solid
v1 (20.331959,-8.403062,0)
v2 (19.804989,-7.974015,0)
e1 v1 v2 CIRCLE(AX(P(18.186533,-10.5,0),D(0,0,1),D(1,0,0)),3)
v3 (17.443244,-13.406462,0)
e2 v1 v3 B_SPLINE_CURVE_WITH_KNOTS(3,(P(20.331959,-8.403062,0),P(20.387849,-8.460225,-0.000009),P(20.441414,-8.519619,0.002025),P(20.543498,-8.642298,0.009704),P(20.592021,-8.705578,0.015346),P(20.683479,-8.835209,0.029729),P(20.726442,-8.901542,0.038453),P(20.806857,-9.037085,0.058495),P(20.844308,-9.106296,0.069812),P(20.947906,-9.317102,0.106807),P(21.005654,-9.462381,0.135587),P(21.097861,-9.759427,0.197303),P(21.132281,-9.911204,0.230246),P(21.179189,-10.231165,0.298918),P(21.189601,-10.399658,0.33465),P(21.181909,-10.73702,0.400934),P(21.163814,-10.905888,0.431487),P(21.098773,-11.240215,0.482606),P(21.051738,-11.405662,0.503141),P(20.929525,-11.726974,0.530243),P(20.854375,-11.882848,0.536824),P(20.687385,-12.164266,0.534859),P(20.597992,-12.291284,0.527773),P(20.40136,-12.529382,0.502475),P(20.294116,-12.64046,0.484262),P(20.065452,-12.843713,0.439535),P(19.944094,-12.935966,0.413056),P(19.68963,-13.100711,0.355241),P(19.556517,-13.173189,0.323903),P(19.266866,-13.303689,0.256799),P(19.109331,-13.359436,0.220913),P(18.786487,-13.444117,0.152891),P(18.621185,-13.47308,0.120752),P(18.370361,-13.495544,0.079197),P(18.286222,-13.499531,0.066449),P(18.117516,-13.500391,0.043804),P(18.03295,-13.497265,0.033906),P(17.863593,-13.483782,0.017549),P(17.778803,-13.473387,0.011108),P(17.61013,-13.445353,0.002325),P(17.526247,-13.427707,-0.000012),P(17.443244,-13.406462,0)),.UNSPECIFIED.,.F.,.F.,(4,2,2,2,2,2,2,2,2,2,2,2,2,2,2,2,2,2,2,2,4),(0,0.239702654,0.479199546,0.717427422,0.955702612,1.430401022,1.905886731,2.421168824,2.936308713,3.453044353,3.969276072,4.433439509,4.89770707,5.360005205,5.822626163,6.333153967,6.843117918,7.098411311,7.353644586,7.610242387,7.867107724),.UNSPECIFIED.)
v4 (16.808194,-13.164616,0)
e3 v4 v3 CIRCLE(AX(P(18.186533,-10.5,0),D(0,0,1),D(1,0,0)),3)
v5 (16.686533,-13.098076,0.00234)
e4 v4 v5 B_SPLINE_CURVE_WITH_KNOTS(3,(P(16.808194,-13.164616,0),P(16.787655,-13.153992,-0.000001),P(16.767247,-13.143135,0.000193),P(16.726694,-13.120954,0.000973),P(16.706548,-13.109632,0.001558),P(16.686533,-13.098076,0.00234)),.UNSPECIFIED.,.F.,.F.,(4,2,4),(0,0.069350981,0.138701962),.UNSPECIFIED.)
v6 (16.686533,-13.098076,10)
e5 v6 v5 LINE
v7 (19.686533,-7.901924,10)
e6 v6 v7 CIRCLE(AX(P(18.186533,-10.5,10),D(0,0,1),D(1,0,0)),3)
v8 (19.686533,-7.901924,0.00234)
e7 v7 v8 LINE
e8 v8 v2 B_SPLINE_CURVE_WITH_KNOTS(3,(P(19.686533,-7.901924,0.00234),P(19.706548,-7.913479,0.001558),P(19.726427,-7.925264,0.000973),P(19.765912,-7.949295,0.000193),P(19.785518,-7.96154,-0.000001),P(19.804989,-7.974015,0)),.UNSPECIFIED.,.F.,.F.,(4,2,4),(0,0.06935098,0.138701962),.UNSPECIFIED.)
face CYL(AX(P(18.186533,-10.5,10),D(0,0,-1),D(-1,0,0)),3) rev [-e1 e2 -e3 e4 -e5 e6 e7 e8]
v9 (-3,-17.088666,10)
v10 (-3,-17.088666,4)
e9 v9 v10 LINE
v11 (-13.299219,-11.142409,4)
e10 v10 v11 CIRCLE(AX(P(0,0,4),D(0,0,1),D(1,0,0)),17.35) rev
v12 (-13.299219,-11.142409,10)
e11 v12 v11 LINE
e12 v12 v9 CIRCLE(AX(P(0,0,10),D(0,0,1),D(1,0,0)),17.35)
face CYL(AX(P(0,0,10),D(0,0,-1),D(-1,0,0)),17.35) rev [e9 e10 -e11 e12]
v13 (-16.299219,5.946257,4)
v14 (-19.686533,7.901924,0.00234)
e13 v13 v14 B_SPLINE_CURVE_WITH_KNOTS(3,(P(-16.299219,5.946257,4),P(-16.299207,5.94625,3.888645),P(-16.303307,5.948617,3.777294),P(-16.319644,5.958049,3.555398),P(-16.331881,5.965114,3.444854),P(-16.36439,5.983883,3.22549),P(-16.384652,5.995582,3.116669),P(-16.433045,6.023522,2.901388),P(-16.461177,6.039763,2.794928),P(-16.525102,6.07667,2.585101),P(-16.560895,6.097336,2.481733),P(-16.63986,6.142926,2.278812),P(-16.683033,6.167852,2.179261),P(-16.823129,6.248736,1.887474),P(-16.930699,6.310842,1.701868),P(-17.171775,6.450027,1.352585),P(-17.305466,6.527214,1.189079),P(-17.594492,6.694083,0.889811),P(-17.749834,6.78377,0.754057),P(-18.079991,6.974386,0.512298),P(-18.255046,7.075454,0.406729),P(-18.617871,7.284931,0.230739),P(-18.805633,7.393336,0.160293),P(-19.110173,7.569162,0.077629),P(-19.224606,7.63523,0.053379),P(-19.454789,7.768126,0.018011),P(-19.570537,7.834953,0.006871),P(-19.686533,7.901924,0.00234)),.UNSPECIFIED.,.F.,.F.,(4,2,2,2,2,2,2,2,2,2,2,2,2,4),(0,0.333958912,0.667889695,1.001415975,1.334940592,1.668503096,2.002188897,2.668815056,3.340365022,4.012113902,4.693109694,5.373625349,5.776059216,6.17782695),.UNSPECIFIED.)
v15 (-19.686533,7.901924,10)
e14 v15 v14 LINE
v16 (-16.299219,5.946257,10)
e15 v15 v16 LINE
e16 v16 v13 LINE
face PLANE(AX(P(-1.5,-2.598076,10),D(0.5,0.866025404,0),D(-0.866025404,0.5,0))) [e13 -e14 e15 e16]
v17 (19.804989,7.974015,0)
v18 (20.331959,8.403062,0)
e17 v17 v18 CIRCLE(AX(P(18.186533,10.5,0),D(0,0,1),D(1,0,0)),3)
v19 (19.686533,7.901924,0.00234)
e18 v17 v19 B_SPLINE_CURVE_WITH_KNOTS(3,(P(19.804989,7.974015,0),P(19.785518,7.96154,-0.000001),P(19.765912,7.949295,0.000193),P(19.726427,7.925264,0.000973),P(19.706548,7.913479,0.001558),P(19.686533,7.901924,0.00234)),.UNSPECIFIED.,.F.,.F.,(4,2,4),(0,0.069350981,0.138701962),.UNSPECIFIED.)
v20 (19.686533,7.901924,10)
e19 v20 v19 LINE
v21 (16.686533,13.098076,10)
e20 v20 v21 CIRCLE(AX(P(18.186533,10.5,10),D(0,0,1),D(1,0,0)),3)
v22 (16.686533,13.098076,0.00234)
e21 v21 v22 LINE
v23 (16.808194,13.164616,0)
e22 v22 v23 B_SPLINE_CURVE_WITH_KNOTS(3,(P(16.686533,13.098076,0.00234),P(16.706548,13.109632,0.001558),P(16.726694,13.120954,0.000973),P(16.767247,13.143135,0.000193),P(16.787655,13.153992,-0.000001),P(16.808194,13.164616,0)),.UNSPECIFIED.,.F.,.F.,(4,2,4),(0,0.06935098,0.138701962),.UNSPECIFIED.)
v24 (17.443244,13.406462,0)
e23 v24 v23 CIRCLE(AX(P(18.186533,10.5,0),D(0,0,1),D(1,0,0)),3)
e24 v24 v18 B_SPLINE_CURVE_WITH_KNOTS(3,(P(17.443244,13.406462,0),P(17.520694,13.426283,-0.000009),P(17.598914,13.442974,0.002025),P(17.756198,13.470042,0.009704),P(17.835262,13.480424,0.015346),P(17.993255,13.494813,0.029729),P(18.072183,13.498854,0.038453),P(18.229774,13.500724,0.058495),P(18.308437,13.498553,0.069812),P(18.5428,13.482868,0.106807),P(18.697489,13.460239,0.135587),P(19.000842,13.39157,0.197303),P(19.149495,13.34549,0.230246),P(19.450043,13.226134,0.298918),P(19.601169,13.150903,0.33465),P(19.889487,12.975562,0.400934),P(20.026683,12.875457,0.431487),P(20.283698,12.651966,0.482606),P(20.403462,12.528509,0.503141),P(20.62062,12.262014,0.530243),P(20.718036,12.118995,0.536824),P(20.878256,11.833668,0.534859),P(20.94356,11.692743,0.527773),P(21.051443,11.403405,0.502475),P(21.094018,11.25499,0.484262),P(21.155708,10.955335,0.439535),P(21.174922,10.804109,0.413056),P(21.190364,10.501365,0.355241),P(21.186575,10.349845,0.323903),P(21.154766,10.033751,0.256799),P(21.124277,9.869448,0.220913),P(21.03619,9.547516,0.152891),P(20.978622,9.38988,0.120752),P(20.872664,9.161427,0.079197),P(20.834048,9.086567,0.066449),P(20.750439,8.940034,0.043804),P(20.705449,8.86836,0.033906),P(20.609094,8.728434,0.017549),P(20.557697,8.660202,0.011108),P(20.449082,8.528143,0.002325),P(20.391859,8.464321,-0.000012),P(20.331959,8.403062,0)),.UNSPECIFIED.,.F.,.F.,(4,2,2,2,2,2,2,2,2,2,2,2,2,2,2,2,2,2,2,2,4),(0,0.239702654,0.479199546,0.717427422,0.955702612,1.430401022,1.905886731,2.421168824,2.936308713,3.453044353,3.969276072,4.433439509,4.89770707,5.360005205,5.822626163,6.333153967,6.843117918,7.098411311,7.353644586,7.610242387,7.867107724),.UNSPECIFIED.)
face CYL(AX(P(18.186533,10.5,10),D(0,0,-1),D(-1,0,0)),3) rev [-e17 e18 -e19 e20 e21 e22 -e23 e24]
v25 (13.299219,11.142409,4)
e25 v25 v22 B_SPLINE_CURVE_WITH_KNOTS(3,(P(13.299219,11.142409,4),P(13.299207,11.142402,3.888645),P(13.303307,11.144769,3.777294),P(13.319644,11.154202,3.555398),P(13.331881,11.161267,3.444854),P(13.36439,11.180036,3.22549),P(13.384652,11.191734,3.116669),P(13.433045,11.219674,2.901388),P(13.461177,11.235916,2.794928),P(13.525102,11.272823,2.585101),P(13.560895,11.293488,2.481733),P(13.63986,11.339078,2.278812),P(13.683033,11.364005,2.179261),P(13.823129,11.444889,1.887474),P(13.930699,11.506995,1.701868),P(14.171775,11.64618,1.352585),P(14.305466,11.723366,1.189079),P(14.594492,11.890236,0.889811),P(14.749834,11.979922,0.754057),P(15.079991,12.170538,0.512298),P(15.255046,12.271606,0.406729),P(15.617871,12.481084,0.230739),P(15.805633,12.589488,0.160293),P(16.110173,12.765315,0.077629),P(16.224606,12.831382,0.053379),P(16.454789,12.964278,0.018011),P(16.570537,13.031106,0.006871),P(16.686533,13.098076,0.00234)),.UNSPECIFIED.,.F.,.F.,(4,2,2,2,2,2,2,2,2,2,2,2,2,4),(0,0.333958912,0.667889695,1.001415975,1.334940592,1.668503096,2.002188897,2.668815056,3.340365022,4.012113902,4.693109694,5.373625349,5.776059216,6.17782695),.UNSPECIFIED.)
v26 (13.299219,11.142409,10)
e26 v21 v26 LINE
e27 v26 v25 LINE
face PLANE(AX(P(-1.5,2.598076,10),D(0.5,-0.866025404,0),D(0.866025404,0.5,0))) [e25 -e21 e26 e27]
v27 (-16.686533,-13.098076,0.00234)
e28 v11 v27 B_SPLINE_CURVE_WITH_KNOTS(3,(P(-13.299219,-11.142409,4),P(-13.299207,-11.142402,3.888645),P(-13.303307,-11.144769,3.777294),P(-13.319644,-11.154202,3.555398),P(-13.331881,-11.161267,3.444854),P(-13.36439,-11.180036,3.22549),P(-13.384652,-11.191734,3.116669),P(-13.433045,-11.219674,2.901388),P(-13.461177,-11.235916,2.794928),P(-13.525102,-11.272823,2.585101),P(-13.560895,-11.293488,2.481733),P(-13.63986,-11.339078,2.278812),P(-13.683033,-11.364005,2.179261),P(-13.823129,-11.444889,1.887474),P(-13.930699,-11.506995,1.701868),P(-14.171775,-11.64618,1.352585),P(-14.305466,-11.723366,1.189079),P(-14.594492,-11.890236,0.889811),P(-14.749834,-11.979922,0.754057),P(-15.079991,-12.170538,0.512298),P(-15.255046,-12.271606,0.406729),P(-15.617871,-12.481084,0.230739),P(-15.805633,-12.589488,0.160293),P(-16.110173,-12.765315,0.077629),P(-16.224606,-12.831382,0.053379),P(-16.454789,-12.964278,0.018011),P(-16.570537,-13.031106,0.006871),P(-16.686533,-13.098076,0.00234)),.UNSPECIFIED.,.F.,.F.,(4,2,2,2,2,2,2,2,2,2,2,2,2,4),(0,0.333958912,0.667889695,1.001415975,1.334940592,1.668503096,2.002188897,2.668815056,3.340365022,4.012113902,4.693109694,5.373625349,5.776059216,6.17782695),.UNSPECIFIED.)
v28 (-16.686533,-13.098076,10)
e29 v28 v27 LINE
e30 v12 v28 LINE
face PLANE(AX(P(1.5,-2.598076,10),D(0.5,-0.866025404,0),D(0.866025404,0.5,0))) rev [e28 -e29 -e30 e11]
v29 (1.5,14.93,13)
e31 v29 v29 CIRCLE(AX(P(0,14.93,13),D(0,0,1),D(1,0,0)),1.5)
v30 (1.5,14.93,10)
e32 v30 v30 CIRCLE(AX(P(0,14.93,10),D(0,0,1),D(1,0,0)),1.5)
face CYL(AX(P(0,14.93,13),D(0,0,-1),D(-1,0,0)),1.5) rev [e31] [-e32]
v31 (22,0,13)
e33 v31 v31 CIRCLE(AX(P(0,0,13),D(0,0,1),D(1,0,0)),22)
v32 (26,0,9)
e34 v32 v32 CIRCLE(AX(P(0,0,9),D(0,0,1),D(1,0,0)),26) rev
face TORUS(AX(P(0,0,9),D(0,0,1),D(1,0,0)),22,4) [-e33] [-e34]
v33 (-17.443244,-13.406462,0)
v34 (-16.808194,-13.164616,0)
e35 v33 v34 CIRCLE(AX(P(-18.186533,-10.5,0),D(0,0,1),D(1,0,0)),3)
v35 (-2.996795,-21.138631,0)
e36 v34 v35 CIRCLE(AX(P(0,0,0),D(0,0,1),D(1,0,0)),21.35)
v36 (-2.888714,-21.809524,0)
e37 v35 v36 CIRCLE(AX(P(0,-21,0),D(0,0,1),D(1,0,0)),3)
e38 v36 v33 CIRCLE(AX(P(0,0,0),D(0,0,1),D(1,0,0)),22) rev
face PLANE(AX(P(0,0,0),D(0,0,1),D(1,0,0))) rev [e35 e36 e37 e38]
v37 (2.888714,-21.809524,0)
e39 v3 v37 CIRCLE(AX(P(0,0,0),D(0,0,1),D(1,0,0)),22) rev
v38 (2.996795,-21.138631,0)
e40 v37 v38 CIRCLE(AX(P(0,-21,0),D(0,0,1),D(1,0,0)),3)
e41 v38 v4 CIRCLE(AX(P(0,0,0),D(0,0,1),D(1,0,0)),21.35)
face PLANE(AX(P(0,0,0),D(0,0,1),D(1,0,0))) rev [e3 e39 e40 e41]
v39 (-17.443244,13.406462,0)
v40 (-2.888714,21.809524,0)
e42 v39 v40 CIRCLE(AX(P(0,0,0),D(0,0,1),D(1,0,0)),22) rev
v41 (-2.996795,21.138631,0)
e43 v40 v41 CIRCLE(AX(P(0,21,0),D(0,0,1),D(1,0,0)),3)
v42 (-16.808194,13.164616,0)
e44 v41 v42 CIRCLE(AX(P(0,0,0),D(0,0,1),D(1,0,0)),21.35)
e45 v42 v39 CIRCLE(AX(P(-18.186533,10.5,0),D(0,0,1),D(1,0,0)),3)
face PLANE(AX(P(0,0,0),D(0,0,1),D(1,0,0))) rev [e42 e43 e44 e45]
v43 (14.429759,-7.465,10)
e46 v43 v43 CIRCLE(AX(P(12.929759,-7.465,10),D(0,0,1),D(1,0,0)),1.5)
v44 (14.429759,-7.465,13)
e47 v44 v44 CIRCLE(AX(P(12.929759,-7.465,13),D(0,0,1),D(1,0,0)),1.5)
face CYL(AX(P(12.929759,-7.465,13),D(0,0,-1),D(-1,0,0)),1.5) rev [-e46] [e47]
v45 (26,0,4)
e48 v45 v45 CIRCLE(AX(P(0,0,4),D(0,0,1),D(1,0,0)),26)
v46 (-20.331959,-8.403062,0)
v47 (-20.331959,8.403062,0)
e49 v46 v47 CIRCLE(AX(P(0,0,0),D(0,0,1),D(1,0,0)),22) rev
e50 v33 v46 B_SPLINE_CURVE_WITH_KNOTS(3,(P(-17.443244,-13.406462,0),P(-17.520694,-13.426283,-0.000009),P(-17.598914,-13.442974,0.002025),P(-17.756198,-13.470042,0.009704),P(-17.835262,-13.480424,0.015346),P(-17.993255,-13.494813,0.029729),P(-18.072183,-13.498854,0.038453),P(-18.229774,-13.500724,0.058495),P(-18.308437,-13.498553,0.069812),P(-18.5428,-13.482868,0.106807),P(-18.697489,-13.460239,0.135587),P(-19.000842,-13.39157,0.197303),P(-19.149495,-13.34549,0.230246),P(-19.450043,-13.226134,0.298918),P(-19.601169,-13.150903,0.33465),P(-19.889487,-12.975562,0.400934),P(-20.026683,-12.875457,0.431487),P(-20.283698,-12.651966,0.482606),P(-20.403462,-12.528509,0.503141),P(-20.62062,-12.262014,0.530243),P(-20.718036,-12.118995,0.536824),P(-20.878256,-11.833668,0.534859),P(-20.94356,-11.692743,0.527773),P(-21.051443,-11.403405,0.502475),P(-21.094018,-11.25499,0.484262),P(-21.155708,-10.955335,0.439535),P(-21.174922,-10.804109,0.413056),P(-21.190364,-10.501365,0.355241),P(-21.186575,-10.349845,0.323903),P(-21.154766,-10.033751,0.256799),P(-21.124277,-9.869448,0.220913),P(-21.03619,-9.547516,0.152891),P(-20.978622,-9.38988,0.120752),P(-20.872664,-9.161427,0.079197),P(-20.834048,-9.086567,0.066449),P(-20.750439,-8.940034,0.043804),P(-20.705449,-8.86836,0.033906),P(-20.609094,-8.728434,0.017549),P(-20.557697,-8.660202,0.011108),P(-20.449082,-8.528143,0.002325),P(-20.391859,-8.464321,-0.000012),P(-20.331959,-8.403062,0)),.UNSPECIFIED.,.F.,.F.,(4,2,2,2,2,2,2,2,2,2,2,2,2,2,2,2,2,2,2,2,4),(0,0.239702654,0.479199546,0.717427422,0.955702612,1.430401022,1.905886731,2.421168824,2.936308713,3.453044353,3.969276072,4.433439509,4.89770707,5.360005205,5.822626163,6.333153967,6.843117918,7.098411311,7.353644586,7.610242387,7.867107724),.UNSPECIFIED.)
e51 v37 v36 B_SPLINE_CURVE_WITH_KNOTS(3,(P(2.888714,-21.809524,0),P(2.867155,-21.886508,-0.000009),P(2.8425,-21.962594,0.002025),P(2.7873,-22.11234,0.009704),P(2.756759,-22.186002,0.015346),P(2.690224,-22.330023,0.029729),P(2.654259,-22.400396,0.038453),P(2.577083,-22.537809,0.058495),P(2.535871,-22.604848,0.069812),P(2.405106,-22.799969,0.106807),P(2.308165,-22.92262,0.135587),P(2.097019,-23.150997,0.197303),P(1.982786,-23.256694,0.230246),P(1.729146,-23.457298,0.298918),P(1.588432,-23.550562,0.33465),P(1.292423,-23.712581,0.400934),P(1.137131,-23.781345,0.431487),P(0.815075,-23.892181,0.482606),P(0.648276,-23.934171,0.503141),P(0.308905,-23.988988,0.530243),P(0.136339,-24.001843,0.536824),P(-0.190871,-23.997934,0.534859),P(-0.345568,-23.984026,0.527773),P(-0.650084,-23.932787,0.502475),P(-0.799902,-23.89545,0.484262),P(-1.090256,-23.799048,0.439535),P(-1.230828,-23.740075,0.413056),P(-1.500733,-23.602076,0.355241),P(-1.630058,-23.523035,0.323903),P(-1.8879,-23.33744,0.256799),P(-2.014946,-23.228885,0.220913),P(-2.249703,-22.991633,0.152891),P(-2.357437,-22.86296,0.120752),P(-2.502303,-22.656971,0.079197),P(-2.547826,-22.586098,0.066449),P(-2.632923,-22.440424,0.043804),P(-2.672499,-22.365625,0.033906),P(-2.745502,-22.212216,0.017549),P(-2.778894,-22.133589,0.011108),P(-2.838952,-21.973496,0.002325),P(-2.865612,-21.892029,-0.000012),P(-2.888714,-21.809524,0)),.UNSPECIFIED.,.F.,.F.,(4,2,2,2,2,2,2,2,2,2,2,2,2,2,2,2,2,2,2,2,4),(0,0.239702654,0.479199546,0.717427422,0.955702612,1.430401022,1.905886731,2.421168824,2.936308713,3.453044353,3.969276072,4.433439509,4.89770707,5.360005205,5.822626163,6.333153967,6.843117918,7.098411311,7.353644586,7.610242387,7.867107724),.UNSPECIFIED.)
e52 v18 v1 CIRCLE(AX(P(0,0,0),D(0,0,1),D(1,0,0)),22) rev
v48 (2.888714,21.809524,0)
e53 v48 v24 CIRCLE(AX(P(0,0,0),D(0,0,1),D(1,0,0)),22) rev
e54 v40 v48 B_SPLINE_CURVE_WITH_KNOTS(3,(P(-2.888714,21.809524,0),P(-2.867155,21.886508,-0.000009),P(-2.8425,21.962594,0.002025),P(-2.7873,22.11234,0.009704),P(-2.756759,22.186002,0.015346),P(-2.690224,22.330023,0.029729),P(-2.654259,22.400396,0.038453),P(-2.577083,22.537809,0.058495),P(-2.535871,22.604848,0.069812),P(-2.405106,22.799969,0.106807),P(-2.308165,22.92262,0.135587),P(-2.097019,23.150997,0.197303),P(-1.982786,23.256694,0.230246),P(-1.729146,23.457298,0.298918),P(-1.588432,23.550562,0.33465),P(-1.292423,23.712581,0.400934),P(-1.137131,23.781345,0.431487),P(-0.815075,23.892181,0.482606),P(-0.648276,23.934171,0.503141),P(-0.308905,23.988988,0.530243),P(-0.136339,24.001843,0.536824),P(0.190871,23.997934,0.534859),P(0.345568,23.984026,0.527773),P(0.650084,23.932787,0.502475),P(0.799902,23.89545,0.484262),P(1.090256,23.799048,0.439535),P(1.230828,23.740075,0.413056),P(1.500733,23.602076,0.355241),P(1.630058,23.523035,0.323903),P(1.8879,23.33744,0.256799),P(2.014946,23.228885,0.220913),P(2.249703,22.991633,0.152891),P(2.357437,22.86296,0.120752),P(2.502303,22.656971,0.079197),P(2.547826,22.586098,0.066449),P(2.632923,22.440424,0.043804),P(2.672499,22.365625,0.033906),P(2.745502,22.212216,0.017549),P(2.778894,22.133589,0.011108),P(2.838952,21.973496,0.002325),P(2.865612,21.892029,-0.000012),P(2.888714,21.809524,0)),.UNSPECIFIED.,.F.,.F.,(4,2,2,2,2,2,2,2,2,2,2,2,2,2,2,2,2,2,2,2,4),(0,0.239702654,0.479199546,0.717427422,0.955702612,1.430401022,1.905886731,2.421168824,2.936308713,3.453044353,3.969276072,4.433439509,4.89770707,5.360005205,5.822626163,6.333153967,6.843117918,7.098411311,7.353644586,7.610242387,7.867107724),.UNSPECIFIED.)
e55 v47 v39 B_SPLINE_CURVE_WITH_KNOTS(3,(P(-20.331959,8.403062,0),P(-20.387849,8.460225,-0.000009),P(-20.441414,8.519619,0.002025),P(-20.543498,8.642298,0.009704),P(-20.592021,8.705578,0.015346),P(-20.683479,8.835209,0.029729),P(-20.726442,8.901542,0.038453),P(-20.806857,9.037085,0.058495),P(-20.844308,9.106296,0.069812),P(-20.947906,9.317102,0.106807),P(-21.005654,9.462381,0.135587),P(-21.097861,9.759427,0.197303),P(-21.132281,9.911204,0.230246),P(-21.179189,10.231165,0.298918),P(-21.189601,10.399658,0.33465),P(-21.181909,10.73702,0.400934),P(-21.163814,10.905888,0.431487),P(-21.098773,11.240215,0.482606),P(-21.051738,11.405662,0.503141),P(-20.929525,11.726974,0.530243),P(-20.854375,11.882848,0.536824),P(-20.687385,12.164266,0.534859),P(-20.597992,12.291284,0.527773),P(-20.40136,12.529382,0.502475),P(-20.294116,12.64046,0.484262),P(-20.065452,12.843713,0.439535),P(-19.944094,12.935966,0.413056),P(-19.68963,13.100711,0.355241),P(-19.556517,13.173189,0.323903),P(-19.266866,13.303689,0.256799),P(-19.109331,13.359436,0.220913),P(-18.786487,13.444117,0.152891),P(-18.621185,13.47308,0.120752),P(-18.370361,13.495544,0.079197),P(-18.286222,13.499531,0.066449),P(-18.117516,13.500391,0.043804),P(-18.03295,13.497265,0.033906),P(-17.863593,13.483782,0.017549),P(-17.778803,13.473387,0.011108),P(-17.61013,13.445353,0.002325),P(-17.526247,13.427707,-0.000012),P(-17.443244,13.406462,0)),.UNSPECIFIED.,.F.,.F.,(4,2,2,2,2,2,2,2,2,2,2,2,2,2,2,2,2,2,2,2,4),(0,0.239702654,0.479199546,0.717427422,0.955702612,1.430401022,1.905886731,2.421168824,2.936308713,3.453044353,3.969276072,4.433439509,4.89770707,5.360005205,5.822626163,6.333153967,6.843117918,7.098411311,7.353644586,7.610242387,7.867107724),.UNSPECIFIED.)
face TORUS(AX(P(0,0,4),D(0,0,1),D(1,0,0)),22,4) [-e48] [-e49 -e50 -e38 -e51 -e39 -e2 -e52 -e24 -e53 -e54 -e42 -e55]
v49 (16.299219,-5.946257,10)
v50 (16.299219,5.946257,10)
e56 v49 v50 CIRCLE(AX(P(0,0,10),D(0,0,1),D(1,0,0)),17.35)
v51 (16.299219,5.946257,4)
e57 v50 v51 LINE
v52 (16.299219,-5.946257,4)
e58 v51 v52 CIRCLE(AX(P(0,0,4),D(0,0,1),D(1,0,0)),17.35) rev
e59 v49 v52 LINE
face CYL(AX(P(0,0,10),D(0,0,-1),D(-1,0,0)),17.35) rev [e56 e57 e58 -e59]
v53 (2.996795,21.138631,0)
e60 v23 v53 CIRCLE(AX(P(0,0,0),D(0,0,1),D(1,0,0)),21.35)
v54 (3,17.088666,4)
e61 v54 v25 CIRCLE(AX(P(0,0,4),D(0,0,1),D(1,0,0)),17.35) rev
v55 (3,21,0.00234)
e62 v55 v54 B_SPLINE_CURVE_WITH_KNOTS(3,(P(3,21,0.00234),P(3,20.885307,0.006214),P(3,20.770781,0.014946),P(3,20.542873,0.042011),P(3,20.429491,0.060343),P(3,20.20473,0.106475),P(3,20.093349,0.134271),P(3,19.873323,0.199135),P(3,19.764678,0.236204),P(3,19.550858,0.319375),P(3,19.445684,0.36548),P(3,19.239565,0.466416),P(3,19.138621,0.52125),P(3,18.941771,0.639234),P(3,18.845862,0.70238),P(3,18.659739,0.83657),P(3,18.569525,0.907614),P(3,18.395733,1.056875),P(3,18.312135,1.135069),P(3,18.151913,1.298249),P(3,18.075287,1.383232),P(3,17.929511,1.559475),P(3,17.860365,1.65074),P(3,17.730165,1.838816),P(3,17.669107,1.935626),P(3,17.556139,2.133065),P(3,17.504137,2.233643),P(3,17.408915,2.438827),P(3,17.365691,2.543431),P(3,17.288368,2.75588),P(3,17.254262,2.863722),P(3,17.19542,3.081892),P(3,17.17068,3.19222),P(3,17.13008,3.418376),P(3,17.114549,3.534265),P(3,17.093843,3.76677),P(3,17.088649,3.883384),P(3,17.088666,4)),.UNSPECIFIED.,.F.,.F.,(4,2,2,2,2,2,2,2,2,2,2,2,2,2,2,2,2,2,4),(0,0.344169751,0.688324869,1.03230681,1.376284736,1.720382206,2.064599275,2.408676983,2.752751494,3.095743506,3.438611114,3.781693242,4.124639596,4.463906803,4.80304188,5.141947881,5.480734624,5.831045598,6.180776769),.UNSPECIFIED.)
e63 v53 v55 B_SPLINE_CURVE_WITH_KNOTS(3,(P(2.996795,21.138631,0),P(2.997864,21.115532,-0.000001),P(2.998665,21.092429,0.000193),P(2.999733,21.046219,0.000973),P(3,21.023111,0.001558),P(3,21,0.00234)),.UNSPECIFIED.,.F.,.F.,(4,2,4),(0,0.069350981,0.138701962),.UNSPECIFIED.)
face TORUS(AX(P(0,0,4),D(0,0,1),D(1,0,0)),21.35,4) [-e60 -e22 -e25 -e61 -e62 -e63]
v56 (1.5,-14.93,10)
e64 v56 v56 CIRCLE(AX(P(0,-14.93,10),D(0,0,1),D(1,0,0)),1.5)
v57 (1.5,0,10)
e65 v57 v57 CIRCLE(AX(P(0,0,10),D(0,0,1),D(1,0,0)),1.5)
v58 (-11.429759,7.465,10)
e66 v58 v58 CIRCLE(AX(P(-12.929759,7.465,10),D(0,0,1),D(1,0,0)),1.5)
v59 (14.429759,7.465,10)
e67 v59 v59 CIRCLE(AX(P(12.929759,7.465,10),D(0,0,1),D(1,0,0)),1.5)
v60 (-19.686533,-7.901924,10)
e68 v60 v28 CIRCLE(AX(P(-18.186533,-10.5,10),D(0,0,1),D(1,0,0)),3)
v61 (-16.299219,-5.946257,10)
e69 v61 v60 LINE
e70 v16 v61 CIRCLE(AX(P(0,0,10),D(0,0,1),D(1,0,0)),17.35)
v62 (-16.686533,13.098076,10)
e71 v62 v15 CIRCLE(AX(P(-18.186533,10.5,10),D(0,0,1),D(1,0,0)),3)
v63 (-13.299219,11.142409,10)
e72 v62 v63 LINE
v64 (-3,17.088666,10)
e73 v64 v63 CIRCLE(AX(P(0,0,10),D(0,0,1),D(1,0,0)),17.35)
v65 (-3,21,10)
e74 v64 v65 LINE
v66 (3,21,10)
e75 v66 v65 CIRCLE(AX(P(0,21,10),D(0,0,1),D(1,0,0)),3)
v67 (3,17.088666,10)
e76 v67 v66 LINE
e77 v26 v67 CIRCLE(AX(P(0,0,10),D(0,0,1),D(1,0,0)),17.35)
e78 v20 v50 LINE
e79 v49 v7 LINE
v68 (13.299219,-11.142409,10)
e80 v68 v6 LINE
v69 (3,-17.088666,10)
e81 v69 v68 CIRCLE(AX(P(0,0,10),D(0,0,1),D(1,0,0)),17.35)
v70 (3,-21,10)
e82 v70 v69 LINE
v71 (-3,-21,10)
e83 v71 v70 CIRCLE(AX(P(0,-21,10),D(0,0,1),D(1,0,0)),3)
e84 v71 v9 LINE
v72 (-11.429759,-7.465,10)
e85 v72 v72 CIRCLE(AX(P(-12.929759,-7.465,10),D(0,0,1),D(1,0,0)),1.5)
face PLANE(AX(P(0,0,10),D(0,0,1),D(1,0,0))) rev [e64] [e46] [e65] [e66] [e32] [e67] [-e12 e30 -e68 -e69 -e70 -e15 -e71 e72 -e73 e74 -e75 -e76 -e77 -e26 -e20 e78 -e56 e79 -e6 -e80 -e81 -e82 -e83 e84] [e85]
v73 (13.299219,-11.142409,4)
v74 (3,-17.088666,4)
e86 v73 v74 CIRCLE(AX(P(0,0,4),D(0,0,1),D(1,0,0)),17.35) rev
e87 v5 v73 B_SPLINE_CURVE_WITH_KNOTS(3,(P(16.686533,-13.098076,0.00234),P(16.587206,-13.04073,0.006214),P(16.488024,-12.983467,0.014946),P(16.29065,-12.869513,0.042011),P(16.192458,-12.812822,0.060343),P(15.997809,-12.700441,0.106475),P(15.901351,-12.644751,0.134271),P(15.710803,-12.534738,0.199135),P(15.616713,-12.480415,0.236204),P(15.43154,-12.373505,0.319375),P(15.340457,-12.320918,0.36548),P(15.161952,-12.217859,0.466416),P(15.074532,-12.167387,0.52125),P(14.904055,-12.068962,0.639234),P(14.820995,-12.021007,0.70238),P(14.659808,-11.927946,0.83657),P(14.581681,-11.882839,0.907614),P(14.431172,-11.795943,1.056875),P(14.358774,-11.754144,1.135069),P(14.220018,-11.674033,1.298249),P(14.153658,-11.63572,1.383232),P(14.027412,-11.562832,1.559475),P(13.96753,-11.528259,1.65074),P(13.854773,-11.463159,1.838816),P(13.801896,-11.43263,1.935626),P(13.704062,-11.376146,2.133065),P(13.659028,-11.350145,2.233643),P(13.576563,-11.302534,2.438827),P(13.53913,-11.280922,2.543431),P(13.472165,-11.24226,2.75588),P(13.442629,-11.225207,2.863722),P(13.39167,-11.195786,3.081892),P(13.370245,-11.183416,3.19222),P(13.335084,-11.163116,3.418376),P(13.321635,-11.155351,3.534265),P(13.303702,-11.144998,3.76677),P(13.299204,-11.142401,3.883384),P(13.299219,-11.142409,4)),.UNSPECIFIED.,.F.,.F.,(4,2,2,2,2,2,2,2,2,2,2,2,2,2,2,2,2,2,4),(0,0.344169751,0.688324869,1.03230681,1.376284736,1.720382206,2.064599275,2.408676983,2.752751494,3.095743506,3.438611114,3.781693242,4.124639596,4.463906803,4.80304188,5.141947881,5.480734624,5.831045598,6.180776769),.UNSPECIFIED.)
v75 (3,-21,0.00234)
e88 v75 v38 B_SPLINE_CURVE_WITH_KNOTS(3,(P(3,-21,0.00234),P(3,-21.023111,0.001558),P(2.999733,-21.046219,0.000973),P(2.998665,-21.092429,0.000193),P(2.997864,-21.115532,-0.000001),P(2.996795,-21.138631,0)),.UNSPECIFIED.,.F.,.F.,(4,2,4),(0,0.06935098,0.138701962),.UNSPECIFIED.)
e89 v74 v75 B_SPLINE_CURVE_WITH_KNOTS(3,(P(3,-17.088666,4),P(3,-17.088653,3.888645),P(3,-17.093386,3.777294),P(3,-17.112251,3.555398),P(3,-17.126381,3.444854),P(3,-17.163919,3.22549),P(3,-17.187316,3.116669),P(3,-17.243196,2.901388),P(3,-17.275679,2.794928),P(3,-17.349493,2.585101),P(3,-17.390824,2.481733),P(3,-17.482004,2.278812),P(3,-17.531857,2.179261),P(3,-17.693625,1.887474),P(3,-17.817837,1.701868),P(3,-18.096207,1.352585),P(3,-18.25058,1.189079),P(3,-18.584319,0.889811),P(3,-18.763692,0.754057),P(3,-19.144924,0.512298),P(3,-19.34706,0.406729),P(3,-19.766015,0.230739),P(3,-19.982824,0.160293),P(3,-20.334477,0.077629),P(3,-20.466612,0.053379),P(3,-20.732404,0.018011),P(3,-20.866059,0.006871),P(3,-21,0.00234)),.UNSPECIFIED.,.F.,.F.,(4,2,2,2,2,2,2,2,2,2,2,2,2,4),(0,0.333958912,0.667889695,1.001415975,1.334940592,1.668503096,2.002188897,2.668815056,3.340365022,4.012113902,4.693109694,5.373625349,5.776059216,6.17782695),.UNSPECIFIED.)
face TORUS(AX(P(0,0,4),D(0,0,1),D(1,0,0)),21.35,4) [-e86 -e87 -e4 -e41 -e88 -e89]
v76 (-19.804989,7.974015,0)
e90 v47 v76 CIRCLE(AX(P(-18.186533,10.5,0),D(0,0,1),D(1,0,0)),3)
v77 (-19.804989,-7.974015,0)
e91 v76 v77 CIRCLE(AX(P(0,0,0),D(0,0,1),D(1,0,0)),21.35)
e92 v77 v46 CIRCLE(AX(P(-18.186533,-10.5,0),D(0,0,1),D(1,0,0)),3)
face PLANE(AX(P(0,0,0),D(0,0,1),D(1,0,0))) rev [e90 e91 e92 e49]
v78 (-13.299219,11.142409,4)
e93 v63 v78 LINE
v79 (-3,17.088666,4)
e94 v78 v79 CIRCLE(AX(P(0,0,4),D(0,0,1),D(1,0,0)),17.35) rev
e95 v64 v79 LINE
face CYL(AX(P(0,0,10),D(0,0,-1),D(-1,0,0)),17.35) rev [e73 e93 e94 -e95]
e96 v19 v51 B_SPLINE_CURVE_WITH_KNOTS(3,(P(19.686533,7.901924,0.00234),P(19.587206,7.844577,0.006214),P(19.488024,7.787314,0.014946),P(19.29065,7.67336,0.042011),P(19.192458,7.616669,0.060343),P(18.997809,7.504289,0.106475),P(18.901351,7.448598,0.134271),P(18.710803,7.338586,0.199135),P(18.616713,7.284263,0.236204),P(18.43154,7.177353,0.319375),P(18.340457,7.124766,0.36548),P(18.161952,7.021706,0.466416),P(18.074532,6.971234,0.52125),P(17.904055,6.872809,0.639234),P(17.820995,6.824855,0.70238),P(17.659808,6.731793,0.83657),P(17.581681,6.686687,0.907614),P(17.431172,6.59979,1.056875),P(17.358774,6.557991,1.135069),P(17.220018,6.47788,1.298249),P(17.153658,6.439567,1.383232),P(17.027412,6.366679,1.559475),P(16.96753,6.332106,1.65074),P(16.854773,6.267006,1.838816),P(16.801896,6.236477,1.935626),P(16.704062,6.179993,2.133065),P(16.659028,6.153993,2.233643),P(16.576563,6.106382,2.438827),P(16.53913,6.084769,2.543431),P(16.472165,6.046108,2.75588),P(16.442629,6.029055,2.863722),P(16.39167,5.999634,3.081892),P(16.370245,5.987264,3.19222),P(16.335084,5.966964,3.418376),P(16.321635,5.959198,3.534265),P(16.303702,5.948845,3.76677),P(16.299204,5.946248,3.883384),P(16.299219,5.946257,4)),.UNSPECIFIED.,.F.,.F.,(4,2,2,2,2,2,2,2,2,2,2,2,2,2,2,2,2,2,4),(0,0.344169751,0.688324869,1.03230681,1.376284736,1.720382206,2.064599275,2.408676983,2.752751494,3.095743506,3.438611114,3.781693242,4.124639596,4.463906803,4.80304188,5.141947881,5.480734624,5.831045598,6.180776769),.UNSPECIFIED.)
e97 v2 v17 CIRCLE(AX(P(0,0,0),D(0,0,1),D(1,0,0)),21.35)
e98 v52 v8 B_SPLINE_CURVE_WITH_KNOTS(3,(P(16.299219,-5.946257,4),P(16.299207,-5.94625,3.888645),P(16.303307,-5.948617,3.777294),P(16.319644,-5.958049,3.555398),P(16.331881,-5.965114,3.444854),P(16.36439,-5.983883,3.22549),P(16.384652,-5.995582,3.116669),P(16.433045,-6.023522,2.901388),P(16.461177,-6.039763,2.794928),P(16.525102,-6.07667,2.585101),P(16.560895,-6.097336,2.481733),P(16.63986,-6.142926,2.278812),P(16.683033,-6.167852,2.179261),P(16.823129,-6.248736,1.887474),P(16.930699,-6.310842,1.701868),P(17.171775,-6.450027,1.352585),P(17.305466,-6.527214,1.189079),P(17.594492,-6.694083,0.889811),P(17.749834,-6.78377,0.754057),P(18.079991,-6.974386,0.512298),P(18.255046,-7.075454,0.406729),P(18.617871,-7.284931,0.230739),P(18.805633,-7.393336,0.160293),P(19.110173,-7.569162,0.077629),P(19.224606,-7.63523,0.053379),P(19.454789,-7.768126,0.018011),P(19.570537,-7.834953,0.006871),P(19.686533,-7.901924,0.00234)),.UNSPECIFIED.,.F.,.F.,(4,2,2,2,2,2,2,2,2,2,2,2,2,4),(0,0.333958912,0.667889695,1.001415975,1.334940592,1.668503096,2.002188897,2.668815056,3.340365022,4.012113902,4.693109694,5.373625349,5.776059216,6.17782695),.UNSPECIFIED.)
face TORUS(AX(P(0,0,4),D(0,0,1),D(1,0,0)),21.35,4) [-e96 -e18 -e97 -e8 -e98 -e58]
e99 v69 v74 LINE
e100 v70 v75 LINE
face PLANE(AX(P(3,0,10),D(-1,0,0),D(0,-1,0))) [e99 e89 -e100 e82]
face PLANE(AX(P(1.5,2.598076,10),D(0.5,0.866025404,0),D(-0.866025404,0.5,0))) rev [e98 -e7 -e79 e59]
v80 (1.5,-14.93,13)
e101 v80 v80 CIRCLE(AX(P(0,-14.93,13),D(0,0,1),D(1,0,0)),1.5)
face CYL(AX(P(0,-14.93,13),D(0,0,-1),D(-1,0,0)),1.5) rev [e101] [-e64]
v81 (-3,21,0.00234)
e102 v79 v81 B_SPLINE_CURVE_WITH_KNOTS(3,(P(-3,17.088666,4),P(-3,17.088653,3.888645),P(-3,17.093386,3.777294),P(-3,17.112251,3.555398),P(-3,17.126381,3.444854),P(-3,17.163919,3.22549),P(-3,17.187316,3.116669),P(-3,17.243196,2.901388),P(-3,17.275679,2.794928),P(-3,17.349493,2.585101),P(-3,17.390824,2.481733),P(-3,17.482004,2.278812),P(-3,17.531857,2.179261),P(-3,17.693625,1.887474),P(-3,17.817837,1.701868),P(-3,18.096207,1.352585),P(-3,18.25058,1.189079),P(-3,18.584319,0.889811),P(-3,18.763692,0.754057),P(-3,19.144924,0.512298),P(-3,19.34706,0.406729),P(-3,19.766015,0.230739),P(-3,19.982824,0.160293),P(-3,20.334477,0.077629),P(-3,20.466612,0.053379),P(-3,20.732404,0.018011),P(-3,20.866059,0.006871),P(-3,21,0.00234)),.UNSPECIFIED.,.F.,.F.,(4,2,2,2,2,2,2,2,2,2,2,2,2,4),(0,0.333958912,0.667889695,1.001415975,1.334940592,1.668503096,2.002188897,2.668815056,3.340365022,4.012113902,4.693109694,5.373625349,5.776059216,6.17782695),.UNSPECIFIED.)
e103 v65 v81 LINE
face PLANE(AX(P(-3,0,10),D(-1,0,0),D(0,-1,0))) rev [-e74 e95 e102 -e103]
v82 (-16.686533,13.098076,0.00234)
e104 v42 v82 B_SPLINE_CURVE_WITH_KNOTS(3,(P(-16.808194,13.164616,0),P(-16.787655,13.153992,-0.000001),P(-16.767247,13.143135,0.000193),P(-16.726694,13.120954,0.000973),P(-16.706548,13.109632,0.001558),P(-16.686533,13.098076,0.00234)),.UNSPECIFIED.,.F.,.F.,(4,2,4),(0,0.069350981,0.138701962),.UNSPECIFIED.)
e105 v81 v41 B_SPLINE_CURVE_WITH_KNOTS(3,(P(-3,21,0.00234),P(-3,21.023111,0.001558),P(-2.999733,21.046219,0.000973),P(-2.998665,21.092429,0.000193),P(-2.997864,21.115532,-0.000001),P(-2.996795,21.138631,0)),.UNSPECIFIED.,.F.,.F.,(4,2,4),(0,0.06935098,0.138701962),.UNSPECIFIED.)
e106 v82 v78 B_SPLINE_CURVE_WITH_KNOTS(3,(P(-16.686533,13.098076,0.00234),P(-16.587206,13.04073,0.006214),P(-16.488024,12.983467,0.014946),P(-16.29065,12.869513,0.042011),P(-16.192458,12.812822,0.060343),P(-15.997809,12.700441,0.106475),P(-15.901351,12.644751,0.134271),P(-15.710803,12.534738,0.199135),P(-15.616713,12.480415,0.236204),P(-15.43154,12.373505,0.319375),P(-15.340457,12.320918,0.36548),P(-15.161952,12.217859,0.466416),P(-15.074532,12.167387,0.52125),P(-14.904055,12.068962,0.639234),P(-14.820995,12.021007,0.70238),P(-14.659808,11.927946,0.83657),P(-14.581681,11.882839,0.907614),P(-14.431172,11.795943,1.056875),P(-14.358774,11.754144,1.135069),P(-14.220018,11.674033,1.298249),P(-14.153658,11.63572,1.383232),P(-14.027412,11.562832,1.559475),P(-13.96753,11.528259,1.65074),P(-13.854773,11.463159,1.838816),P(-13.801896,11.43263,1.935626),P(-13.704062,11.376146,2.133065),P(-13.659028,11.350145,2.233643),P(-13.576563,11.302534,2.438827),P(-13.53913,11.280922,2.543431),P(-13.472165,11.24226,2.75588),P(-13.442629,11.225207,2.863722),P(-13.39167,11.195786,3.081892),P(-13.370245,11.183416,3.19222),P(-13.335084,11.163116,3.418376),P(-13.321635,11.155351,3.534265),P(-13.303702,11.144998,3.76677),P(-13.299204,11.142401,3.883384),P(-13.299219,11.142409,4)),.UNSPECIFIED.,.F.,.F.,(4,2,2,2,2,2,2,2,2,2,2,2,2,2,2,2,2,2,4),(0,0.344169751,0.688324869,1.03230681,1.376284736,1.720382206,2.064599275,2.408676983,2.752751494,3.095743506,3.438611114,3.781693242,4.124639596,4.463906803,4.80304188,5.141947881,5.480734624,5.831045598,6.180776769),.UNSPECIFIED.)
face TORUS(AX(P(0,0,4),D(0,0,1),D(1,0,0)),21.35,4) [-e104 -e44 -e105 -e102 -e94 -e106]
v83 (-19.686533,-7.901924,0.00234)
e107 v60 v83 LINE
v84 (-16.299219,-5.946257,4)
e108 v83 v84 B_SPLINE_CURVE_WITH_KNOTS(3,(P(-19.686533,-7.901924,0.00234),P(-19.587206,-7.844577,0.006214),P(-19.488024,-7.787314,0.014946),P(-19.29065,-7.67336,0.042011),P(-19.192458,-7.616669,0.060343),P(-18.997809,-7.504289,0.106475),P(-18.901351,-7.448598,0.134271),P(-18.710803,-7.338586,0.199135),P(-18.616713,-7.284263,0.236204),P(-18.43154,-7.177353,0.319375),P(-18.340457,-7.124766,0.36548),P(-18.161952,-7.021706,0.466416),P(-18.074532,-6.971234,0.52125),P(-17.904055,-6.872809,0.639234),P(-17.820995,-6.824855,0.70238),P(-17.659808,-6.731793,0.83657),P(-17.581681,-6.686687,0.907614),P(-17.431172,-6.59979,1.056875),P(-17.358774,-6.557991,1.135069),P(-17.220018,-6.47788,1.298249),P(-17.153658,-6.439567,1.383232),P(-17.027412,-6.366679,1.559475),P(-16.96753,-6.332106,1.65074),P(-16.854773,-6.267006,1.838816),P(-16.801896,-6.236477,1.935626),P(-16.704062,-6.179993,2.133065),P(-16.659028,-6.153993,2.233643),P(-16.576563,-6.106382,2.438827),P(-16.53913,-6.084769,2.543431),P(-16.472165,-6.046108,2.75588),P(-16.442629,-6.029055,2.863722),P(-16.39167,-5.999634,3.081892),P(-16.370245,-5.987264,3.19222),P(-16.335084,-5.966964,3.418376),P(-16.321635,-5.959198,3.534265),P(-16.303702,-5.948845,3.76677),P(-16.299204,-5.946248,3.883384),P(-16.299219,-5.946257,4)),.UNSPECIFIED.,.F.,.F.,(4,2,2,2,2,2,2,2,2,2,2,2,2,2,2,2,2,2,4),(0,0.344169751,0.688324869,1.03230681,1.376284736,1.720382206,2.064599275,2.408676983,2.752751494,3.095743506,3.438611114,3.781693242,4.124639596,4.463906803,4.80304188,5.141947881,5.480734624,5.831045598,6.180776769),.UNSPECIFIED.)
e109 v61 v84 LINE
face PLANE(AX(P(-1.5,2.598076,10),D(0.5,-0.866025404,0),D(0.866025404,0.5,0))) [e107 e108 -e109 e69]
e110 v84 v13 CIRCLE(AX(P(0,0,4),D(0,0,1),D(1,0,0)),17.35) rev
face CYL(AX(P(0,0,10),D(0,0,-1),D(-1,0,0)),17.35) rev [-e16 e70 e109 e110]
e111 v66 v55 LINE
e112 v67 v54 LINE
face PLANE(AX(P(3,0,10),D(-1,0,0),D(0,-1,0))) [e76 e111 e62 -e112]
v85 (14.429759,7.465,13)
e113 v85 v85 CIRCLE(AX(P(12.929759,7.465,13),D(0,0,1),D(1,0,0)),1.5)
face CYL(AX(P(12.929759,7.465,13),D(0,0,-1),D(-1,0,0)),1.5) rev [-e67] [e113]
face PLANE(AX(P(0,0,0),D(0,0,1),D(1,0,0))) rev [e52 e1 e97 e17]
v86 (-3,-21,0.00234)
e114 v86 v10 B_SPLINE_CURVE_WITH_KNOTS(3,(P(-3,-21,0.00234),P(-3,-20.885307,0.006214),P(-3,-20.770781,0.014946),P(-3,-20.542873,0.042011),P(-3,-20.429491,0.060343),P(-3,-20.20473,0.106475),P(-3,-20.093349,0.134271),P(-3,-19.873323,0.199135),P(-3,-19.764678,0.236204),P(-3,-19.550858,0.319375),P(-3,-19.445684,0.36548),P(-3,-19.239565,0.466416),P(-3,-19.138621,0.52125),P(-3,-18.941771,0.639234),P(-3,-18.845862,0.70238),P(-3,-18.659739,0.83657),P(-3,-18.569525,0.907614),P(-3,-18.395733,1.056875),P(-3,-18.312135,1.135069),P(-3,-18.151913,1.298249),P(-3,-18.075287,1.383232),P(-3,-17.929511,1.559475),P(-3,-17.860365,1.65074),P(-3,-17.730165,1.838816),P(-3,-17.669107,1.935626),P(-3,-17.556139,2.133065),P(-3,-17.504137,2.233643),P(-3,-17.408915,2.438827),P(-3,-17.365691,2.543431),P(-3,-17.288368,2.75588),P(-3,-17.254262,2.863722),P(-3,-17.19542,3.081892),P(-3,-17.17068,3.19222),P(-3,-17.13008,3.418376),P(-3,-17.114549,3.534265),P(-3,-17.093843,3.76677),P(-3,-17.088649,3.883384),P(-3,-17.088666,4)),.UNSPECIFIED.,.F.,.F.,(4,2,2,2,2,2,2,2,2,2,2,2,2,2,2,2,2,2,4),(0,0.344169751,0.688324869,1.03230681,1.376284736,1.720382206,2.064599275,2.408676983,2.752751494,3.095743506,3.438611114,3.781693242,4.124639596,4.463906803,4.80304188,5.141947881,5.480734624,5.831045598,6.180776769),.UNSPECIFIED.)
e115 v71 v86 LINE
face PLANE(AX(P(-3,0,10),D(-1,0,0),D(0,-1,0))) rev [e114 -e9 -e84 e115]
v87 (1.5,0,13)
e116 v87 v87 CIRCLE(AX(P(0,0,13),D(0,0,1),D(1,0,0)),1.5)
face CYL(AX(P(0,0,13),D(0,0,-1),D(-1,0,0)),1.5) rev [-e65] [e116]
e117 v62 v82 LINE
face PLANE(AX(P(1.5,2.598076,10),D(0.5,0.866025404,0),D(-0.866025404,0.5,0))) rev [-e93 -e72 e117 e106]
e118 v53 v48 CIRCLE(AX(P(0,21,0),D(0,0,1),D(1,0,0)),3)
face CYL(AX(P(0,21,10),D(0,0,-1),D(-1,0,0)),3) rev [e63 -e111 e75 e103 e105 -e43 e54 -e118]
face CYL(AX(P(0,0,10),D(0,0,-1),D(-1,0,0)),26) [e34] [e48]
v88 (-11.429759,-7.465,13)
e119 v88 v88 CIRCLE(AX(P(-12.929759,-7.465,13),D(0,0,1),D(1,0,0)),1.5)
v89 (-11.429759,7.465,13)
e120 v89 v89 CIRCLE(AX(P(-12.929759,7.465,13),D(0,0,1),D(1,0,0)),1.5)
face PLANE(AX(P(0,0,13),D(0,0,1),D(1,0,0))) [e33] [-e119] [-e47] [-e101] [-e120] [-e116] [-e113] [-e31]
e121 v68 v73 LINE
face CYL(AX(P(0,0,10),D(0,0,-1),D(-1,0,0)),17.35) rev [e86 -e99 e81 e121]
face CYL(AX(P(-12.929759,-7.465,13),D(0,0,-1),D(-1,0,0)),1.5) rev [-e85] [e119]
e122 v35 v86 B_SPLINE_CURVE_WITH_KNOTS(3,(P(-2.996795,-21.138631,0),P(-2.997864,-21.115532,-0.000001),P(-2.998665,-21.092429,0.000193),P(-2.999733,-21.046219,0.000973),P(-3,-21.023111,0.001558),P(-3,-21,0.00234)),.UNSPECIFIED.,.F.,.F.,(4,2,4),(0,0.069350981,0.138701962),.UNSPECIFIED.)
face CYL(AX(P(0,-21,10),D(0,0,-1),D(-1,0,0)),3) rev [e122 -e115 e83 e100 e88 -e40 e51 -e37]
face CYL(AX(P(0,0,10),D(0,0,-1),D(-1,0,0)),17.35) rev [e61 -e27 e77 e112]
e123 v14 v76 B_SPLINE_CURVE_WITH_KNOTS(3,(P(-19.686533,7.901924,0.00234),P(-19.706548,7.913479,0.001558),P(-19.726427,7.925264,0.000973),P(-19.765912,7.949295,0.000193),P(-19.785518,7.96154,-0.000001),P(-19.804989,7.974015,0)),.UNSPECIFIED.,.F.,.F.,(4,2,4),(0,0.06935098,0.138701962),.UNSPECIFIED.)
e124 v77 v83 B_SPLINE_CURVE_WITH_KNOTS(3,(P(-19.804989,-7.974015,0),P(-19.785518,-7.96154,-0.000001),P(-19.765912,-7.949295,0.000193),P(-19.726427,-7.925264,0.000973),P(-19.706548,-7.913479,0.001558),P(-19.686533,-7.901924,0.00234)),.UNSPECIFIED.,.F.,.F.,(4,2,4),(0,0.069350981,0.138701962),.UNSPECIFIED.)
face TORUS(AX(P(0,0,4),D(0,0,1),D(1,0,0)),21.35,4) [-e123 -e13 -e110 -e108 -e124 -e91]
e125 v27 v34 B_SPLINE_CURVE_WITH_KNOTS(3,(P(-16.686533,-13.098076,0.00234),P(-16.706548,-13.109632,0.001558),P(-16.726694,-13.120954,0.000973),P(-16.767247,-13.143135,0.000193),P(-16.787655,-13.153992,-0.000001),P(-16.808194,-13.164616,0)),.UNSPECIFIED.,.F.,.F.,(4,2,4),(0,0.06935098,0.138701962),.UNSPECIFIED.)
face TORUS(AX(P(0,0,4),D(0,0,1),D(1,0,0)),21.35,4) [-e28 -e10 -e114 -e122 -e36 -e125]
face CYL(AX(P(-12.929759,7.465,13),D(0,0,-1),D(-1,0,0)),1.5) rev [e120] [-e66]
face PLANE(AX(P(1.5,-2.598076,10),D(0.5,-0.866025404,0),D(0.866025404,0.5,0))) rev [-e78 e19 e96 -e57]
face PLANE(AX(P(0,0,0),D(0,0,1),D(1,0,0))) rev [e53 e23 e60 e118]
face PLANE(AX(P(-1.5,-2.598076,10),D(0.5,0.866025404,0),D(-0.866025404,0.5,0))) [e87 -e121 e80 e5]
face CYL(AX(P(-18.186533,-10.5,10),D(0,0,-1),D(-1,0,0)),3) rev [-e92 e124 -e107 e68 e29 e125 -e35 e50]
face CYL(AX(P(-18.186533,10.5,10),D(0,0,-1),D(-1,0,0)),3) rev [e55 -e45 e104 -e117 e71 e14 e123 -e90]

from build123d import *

# Parameters (mm, degrees)
SKETCH_1_R      = 26
EXTRUDE_1_DEPTH = 10
SKETCH_2_R      = 26
SKETCH_2_R_2    = 1.5
EXTRUDE_2_DEPTH = 3
FILLET_1_R      = 4
FILLET_2_R      = 4


with BuildPart() as part:
    # 草图1 → 凸台-拉伸1 (new body)
    with BuildSketch(Plane.XY):
        Circle(SKETCH_1_R)
        with BuildLine():
            ThreePointArc((3, -21), (0, -24), (-3, -21))
            Line((-3, -21), (-3, -17.088665834))
            ThreePointArc((-3, -17.088665834), (-8.675, -15.025540756), (-13.299218729, -11.142409129))
            Line((-13.299218729, -11.142409129), (-16.686533479, -13.098076211))
            ThreePointArc((-16.686533479, -13.098076211), (-20.784609691, -12), (-19.686533479, -7.901923789))
            Line((-19.686533479, -7.901923789), (-16.299218729, -5.946256706))
            ThreePointArc((-16.299218729, -5.946256706), (-17.35, 0), (-16.299218729, 5.946256706))
            Line((-16.299218729, 5.946256706), (-19.686533479, 7.901923789))
            ThreePointArc((-19.686533479, 7.901923789), (-20.784609691, 12), (-16.686533479, 13.098076211))
            Line((-16.686533479, 13.098076211), (-13.299218729, 11.142409129))
            ThreePointArc((-13.299218729, 11.142409129), (-8.675, 15.025540756), (-3, 17.088665834))
            Line((-3, 17.088665834), (-3, 21))
            ThreePointArc((-3, 21), (0, 24), (3, 21))
            Line((3, 21), (3, 17.088665834))
            ThreePointArc((3, 17.088665834), (8.675, 15.025540756), (13.299218729, 11.142409129))
            Line((13.299218729, 11.142409129), (16.686533479, 13.098076211))
            ThreePointArc((16.686533479, 13.098076211), (20.784609691, 12), (19.686533479, 7.901923789))
            Line((19.686533479, 7.901923789), (16.299218729, 5.946256706))
            ThreePointArc((16.299218729, 5.946256706), (17.085285262, 3.019193191), (17.35, 0))
            ThreePointArc((17.35, 0), (17.085285262, -3.019193191), (16.299218729, -5.946256706))
            Line((16.299218729, -5.946256706), (19.686533479, -7.901923789))
            ThreePointArc((19.686533479, -7.901923789), (20.784609691, -12), (16.686533479, -13.098076211))
            Line((16.686533479, -13.098076211), (13.299218729, -11.142409129))
            ThreePointArc((13.299218729, -11.142409129), (8.675, -15.025540756), (3, -17.088665834))
            Line((3, -17.088665834), (3, -21))
        make_face(mode=Mode.SUBTRACT)
    extrude(amount=EXTRUDE_1_DEPTH)

    # 草图2 → 凸台-拉伸2 (add)
    with BuildSketch(Plane.XY.offset(10)):
        Circle(SKETCH_2_R)
        with Locations((0, 14.93)):
            Circle(SKETCH_2_R_2, mode=Mode.SUBTRACT)
        with Locations((12.929759279, 7.465)):
            Circle(SKETCH_2_R_2, mode=Mode.SUBTRACT)
        with Locations((12.929759279, -7.465)):
            Circle(SKETCH_2_R_2, mode=Mode.SUBTRACT)
        with Locations((0, -14.93)):
            Circle(SKETCH_2_R_2, mode=Mode.SUBTRACT)
        with Locations((-12.929759279, -7.465)):
            Circle(SKETCH_2_R_2, mode=Mode.SUBTRACT)
        with Locations((-12.929759279, 7.465)):
            Circle(SKETCH_2_R_2, mode=Mode.SUBTRACT)
        Circle(SKETCH_2_R_2, mode=Mode.SUBTRACT)
    extrude(amount=EXTRUDE_2_DEPTH)

    # 圆角1
    # the kernel refuses this fillet: 4 mm, written as the material it takes off along each edge
    with BuildSketch(Plane(origin=(0, 0, 0), x_dir=(1, 0, 0), z_dir=(0, -1, 0))) as fillet_1_piece_1:
        with BuildLine():
            CenterArc((26 - FILLET_1_R, FILLET_1_R), FILLET_1_R, 270, 90)
            Line((26 - FILLET_1_R, 0), (26, 0))
            Line((26, 0), (26, FILLET_1_R))
        make_face()
    revolve(axis=Axis((0, 0, 0), (0, 0, 1)), mode=Mode.SUBTRACT)
    with BuildSketch(Plane(origin=(0, 0, 13), x_dir=(1, 0, 0), z_dir=(0, -1, 0))) as fillet_1_piece_2:
        with BuildLine():
            CenterArc((26 - FILLET_1_R, -FILLET_1_R), FILLET_1_R, 0, 90)
            Line((26 - FILLET_1_R, 0), (26, 0))
            Line((26, 0), (26, -FILLET_1_R))
        make_face()
    revolve(axis=Axis((0, 0, 13), (0, 0, 1)), mode=Mode.SUBTRACT)

    # 圆角2
    fillet_2_edges = [part.edges().sort_by_distance(p)[0] for p in [
        (-17.35, 0, 0),
        (-8.675, 15.025540756, 0),
        (8.675, 15.025540756, 0),
        (17.35, 0, 0),
        (8.675, -15.025540756, 0),
        (-8.675, -15.025540756, 0),
    ]]
    fillet(fillet_2_edges, radius=FILLET_2_R)


solid = part.part
